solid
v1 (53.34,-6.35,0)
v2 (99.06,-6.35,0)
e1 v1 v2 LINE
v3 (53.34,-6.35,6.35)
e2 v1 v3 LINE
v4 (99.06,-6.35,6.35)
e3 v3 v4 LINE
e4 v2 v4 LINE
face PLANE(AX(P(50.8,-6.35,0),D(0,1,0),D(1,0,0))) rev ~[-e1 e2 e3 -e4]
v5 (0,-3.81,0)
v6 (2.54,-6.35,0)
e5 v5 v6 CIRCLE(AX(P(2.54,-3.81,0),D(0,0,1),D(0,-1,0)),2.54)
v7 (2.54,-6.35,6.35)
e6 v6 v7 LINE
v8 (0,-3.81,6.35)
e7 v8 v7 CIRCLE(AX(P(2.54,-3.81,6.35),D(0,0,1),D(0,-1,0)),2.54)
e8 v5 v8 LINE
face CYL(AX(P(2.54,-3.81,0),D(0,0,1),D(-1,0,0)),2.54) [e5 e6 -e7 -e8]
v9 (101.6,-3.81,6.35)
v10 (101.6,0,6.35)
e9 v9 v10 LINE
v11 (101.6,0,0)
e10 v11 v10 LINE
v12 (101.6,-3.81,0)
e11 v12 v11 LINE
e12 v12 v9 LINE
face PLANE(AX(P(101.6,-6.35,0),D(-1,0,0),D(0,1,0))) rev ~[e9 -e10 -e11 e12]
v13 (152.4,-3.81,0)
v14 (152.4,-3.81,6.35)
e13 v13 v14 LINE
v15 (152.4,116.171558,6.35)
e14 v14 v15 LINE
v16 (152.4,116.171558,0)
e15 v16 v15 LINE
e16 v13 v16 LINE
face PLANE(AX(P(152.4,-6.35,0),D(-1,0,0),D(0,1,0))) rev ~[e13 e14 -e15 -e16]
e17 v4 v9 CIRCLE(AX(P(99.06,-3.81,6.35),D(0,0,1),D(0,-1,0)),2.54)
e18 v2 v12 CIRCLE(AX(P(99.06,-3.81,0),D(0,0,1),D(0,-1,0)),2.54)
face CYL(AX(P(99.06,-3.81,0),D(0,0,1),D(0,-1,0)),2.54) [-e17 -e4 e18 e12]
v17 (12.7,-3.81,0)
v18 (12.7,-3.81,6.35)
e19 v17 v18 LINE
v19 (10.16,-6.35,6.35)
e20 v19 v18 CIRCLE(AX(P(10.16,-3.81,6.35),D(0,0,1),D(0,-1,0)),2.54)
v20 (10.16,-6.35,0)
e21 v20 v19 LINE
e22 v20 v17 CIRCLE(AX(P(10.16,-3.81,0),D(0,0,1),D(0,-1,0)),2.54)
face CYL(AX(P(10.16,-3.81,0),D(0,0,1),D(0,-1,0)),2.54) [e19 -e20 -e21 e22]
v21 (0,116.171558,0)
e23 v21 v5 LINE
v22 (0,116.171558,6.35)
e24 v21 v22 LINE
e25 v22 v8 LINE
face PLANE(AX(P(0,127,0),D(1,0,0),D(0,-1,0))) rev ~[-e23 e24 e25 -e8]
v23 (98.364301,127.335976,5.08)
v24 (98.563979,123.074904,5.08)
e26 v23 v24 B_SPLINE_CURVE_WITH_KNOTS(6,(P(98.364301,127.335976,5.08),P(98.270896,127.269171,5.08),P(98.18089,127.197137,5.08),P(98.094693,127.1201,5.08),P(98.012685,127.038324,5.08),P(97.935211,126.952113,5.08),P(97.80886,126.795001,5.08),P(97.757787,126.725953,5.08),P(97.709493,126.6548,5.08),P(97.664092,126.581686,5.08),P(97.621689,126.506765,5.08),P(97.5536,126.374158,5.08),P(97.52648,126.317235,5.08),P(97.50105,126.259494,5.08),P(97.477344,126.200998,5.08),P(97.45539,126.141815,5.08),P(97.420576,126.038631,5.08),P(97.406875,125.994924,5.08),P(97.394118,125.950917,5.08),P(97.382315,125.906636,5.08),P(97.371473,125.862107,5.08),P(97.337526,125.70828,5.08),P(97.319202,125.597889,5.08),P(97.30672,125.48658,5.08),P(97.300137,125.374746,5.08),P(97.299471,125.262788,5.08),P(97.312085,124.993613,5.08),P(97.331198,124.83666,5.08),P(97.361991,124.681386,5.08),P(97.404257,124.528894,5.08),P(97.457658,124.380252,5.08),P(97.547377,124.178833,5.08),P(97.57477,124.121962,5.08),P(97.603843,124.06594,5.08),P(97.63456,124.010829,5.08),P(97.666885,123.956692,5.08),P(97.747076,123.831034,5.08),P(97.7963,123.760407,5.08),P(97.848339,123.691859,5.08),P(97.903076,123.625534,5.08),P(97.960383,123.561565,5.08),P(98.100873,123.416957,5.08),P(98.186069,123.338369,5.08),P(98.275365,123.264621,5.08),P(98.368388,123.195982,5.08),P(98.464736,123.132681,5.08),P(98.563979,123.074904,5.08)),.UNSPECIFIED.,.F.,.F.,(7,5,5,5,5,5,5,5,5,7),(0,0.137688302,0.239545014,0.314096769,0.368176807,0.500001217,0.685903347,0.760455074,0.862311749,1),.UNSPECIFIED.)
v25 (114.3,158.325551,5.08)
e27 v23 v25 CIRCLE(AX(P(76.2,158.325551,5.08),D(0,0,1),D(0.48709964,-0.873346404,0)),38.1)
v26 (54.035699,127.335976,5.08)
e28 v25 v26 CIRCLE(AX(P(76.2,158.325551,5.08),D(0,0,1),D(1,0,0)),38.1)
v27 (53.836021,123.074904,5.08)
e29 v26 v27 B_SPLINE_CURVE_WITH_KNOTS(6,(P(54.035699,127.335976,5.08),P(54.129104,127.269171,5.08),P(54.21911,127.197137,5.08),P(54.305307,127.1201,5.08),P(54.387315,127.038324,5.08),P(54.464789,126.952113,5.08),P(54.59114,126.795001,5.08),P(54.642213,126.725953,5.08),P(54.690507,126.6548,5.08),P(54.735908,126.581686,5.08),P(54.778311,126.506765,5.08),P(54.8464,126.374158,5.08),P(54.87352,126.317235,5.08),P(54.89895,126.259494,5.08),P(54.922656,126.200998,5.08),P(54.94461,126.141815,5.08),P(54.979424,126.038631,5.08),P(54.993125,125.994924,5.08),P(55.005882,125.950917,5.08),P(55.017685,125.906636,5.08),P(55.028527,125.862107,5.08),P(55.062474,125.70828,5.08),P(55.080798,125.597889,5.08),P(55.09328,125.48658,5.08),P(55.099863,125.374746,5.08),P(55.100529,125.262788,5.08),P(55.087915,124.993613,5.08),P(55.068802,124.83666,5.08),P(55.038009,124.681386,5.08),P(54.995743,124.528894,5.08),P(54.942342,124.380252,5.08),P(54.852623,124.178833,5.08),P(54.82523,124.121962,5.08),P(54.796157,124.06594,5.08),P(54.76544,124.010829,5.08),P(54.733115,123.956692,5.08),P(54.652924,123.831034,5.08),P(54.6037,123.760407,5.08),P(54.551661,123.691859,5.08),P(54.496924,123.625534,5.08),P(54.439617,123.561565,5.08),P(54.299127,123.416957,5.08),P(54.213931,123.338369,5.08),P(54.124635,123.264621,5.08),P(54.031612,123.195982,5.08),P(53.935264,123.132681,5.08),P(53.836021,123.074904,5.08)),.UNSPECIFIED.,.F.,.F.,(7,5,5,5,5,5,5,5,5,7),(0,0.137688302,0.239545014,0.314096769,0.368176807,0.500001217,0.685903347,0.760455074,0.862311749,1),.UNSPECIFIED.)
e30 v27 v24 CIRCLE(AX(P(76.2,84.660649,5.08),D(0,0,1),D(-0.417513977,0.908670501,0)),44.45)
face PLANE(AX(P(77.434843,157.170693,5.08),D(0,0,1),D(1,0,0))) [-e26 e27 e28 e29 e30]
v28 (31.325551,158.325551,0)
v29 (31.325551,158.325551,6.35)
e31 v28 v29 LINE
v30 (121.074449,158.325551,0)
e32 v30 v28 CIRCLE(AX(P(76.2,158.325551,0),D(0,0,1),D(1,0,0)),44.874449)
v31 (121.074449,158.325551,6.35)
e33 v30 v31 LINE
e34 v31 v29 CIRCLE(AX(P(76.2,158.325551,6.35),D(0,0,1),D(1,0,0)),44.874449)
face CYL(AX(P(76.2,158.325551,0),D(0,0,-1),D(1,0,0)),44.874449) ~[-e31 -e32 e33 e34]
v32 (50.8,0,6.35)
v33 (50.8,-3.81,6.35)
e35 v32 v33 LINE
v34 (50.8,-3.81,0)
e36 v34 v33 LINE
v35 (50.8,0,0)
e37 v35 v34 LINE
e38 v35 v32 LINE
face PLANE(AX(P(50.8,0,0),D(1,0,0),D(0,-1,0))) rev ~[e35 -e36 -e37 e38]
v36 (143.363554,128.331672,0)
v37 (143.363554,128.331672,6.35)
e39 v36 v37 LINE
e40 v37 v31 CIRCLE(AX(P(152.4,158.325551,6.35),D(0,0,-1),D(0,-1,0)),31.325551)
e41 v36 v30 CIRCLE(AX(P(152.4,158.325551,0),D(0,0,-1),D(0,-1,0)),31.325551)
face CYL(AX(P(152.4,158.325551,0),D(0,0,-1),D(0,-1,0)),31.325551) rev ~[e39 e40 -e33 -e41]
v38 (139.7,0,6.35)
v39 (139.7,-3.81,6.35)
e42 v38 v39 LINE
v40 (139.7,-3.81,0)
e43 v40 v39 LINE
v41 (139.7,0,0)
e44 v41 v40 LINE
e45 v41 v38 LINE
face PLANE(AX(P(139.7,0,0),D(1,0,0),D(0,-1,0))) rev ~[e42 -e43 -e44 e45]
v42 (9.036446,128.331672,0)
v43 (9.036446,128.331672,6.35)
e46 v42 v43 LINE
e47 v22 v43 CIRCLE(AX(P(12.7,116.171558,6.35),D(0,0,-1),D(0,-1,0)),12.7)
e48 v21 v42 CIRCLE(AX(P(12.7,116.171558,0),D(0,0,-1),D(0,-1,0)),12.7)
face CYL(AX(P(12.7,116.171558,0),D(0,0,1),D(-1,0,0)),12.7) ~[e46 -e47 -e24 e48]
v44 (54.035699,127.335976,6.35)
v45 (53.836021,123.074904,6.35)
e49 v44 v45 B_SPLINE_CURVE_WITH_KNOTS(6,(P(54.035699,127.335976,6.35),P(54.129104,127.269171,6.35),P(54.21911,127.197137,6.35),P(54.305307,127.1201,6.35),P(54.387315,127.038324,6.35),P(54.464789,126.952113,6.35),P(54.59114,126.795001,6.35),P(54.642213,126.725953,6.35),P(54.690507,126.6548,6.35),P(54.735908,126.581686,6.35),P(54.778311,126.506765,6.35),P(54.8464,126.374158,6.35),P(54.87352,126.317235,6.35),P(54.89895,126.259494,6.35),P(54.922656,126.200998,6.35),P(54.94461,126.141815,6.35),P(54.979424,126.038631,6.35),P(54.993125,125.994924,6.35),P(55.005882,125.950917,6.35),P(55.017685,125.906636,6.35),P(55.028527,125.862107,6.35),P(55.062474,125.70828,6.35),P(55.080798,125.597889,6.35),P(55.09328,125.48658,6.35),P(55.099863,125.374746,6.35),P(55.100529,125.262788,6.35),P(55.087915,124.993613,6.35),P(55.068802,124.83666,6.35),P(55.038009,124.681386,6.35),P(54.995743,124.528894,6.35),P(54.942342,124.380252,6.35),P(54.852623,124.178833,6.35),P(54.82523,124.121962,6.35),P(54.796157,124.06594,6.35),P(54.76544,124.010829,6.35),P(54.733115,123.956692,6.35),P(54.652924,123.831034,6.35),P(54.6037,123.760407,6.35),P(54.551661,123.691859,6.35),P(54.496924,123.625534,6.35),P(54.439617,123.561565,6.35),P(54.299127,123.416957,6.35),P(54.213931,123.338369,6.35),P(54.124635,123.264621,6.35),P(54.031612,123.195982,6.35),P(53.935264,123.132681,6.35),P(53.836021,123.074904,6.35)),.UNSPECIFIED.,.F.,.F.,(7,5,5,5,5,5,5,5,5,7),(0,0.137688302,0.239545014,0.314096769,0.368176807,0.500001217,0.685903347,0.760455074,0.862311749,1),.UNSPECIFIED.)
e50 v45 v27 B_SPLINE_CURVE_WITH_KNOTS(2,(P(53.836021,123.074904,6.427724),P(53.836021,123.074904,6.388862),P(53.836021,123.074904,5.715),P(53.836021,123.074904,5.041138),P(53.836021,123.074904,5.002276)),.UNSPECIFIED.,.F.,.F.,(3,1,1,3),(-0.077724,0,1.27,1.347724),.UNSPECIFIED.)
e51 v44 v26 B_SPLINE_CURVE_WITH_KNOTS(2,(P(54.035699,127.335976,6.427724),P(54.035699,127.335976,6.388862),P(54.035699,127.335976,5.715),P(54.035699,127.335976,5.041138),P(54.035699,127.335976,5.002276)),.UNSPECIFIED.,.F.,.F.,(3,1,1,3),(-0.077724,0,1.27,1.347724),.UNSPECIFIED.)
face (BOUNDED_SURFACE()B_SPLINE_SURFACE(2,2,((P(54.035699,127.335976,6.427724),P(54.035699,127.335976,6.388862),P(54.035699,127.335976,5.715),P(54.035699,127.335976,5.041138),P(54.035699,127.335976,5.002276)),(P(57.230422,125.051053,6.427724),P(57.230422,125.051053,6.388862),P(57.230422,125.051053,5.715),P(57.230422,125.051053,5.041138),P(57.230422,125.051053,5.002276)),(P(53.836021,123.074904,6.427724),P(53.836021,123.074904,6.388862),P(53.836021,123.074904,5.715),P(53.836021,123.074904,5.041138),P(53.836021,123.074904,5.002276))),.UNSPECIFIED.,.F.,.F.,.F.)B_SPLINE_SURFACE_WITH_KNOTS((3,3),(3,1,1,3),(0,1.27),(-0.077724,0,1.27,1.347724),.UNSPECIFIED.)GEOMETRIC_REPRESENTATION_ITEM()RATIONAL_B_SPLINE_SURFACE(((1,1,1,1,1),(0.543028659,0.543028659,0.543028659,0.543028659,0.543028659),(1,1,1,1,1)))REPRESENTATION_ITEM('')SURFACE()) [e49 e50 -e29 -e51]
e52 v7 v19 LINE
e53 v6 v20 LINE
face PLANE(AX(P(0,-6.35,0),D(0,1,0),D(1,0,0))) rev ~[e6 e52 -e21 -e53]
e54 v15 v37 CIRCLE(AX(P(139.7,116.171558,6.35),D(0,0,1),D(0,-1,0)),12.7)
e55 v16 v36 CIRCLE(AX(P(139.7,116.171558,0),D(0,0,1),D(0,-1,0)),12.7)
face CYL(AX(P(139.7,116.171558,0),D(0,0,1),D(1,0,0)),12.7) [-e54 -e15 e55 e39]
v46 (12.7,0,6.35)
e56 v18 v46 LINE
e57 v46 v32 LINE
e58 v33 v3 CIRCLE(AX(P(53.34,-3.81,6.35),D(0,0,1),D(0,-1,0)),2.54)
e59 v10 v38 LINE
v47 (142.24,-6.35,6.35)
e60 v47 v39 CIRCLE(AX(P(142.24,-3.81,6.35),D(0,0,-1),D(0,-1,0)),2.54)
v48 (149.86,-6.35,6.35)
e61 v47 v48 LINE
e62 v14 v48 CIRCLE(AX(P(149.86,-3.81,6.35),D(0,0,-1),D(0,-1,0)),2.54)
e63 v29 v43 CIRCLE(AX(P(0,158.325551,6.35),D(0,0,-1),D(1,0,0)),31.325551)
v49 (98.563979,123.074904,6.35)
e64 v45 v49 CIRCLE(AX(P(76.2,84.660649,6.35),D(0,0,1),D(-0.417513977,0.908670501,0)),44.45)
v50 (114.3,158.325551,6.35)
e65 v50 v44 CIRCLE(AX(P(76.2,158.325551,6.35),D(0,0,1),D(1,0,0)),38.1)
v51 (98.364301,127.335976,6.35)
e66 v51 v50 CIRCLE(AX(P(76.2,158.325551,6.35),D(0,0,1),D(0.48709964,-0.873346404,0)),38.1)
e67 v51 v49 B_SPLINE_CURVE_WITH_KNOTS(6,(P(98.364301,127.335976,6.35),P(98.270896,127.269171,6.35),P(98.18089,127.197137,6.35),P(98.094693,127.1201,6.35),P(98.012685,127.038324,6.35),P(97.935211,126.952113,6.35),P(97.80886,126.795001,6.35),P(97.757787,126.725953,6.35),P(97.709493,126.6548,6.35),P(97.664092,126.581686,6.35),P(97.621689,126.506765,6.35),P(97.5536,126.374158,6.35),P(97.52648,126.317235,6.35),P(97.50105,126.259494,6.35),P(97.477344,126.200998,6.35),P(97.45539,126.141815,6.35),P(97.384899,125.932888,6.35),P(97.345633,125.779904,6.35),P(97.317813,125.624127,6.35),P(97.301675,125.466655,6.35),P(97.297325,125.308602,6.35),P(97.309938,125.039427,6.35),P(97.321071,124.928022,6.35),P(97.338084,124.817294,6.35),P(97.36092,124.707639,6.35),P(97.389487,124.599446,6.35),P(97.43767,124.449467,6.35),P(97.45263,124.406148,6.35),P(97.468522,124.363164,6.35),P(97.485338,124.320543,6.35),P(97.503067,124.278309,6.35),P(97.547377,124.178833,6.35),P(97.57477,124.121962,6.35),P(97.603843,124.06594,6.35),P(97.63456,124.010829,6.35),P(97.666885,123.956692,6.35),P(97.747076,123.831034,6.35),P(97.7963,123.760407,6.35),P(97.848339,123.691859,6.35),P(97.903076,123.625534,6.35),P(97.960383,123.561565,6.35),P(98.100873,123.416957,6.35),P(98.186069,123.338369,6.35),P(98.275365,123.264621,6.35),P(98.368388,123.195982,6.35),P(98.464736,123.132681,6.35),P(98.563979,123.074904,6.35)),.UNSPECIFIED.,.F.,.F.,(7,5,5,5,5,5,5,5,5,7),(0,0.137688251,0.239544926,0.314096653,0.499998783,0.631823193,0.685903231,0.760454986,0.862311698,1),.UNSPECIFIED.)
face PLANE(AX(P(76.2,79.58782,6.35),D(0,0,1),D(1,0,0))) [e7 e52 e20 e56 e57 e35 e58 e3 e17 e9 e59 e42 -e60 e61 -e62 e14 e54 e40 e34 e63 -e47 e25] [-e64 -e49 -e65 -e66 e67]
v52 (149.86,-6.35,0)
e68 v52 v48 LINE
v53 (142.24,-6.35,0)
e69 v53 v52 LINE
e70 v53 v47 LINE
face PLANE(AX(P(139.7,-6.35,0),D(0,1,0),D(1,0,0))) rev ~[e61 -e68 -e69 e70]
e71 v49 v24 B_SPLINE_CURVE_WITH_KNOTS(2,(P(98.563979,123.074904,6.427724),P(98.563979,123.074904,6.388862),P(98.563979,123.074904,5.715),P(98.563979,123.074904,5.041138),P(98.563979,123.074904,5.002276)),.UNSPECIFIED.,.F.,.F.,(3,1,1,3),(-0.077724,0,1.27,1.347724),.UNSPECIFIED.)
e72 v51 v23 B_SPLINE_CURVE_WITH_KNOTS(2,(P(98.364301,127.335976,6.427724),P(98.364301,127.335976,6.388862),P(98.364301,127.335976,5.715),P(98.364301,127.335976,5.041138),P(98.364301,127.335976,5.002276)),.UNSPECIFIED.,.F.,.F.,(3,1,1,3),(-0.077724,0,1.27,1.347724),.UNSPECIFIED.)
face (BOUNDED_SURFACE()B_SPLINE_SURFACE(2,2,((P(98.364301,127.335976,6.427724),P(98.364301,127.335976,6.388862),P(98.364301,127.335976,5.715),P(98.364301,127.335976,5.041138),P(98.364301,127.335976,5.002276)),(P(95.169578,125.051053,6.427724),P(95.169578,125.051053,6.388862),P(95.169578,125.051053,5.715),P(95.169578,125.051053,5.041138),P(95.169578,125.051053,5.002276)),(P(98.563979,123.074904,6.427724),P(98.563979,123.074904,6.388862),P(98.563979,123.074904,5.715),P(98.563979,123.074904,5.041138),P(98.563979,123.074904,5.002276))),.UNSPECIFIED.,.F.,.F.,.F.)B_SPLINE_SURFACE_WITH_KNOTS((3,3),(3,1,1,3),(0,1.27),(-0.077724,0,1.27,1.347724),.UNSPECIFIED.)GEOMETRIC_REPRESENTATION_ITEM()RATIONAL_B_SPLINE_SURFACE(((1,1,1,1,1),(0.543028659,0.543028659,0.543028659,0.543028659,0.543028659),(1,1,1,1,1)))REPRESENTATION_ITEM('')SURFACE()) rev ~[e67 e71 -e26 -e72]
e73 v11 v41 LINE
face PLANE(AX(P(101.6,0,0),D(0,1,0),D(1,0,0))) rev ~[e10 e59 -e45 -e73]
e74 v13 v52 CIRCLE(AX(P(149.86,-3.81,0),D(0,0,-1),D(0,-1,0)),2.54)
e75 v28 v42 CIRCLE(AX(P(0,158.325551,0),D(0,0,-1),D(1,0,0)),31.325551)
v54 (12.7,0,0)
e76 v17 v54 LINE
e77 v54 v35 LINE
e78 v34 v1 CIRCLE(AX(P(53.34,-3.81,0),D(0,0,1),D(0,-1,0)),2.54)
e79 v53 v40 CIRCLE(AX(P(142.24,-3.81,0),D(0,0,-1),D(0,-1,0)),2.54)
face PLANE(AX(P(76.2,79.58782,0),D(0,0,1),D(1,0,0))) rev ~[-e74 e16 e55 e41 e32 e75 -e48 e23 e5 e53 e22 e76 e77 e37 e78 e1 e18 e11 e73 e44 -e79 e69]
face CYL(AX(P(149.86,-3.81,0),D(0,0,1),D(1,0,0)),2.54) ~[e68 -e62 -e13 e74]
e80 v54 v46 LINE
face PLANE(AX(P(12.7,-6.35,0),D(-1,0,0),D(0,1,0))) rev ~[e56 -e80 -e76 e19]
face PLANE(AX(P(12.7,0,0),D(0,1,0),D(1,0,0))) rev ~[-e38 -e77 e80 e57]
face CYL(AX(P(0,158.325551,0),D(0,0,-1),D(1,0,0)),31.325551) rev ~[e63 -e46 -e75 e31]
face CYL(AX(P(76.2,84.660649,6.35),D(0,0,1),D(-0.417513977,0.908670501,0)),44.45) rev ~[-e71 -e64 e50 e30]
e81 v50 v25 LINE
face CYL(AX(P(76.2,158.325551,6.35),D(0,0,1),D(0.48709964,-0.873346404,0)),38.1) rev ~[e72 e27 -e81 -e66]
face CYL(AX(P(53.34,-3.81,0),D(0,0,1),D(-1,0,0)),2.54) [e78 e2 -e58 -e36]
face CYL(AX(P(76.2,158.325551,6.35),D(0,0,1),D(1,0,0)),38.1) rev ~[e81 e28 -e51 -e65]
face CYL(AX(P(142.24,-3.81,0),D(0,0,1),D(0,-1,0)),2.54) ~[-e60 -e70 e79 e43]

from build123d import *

# Parameters (mm, degrees)
F1_DEPTH = 6.35
F2_R     = 12.7
F3_R     = 2.54
F5_DEPTH = 1.27
F6_R     = 2.54


# Not quite as in the source:
# - a feature names something its author has since deleted; it is built from what else it names


with BuildPart() as f1:
    # F0 (on Top) → F1 (new body)
    with BuildSketch(Plane.XY):
        with BuildLine():
            Line((0, 127), (0, 0))
            Line((0, 0), (0, -6.35))
            Line((0, -6.35), (12.7, -6.35))
            Line((12.7, -6.35), (12.7, 0))
            Line((12.7, 0), (50.8, 0))
            Line((50.8, 0), (50.8, -6.35))
            Line((50.8, -6.35), (101.6, -6.35))
            Line((101.6, -6.35), (101.6, 0))
            Line((101.6, 0), (139.7, 0))
            Line((139.7, 0), (139.7, -6.35))
            Line((139.7, -6.35), (152.4, -6.35))
            Line((152.4, -6.35), (152.4, 0))
            Line((152.4, 0), (152.4, 127))
            ThreePointArc((152.4, 127), (130.249490442, 136.1750414724), (121.0744489697, 158.3255510303))
            ThreePointArc((121.0744489697, 158.3255510303), (76.2, 203.2), (31.3255510303, 158.3255510303))
            ThreePointArc((31.3255510303, 158.3255510303), (22.150509558, 136.1750414724), (0, 127))
        make_face()
    extrude(amount=F1_DEPTH)

    # F2
    f2_edges = [f1.edges().sort_by_distance(p)[0] for p in [
        (0, 127, 3.175),
        (152.4, 127, 3.175),
    ]]
    fillet(f2_edges, radius=F2_R)

    # F3
    f3_edges = [f1.edges().sort_by_distance(p)[0] for p in [
        (0, -6.35, 3.175),
        (12.7, -6.35, 3.175),
        (50.8, -6.35, 3.175),
        (101.6, -6.35, 3.175),
        (139.7, -6.35, 3.175),
        (152.4, -6.35, 3.175),
    ]]
    fillet(f3_edges, radius=F3_R)

    # F4 (on face) → F5 (cut)
    with BuildSketch(Plane.XY.offset(6.35)):
        with BuildLine():
            ThreePointArc((94.7584962883, 125.0510530549), (109.0533766041, 139.0313641932), (114.3, 158.3255510303))
            ThreePointArc((114.3, 158.3255510303), (56.9058131628, 191.1789276345), (57.6415037117, 125.0510530549))
            ThreePointArc((57.6415037117, 125.0510530549), (76.2, 129.1106492996), (94.7584962883, 125.0510530549))
        make_face()
        with BuildLine():
            ThreePointArc((94.7584962883, 125.0510530549), (76.2, 120.2255510303), (57.6415037117, 125.0510530549))
            ThreePointArc((57.6415037117, 125.0510530549), (52.2116972257, 47.2392138647), (120.65, 84.6606492996))
            ThreePointArc((120.65, 84.6606492996), (113.6214354349, 108.6489520739), (94.7584962883, 125.0510530549))
        make_face()
        with BuildLine():
            ThreePointArc((94.7584962883, 125.0510530549), (76.2, 129.1106492996), (57.6415037117, 125.0510530549))
            ThreePointArc((57.6415037117, 125.0510530549), (76.2, 120.2255510303), (94.7584962883, 125.0510530549))
        make_face()
    extrude(amount=-F5_DEPTH, mode=Mode.SUBTRACT)

    # F6
    f6_edges = [f1.edges().sort_by_distance(p)[0] for p in [
        (57.641504, 125.051053, 5.715),
        (94.758496, 125.051053, 5.715),
    ]]
    fillet(f6_edges, radius=F6_R)


solid = f1.part
